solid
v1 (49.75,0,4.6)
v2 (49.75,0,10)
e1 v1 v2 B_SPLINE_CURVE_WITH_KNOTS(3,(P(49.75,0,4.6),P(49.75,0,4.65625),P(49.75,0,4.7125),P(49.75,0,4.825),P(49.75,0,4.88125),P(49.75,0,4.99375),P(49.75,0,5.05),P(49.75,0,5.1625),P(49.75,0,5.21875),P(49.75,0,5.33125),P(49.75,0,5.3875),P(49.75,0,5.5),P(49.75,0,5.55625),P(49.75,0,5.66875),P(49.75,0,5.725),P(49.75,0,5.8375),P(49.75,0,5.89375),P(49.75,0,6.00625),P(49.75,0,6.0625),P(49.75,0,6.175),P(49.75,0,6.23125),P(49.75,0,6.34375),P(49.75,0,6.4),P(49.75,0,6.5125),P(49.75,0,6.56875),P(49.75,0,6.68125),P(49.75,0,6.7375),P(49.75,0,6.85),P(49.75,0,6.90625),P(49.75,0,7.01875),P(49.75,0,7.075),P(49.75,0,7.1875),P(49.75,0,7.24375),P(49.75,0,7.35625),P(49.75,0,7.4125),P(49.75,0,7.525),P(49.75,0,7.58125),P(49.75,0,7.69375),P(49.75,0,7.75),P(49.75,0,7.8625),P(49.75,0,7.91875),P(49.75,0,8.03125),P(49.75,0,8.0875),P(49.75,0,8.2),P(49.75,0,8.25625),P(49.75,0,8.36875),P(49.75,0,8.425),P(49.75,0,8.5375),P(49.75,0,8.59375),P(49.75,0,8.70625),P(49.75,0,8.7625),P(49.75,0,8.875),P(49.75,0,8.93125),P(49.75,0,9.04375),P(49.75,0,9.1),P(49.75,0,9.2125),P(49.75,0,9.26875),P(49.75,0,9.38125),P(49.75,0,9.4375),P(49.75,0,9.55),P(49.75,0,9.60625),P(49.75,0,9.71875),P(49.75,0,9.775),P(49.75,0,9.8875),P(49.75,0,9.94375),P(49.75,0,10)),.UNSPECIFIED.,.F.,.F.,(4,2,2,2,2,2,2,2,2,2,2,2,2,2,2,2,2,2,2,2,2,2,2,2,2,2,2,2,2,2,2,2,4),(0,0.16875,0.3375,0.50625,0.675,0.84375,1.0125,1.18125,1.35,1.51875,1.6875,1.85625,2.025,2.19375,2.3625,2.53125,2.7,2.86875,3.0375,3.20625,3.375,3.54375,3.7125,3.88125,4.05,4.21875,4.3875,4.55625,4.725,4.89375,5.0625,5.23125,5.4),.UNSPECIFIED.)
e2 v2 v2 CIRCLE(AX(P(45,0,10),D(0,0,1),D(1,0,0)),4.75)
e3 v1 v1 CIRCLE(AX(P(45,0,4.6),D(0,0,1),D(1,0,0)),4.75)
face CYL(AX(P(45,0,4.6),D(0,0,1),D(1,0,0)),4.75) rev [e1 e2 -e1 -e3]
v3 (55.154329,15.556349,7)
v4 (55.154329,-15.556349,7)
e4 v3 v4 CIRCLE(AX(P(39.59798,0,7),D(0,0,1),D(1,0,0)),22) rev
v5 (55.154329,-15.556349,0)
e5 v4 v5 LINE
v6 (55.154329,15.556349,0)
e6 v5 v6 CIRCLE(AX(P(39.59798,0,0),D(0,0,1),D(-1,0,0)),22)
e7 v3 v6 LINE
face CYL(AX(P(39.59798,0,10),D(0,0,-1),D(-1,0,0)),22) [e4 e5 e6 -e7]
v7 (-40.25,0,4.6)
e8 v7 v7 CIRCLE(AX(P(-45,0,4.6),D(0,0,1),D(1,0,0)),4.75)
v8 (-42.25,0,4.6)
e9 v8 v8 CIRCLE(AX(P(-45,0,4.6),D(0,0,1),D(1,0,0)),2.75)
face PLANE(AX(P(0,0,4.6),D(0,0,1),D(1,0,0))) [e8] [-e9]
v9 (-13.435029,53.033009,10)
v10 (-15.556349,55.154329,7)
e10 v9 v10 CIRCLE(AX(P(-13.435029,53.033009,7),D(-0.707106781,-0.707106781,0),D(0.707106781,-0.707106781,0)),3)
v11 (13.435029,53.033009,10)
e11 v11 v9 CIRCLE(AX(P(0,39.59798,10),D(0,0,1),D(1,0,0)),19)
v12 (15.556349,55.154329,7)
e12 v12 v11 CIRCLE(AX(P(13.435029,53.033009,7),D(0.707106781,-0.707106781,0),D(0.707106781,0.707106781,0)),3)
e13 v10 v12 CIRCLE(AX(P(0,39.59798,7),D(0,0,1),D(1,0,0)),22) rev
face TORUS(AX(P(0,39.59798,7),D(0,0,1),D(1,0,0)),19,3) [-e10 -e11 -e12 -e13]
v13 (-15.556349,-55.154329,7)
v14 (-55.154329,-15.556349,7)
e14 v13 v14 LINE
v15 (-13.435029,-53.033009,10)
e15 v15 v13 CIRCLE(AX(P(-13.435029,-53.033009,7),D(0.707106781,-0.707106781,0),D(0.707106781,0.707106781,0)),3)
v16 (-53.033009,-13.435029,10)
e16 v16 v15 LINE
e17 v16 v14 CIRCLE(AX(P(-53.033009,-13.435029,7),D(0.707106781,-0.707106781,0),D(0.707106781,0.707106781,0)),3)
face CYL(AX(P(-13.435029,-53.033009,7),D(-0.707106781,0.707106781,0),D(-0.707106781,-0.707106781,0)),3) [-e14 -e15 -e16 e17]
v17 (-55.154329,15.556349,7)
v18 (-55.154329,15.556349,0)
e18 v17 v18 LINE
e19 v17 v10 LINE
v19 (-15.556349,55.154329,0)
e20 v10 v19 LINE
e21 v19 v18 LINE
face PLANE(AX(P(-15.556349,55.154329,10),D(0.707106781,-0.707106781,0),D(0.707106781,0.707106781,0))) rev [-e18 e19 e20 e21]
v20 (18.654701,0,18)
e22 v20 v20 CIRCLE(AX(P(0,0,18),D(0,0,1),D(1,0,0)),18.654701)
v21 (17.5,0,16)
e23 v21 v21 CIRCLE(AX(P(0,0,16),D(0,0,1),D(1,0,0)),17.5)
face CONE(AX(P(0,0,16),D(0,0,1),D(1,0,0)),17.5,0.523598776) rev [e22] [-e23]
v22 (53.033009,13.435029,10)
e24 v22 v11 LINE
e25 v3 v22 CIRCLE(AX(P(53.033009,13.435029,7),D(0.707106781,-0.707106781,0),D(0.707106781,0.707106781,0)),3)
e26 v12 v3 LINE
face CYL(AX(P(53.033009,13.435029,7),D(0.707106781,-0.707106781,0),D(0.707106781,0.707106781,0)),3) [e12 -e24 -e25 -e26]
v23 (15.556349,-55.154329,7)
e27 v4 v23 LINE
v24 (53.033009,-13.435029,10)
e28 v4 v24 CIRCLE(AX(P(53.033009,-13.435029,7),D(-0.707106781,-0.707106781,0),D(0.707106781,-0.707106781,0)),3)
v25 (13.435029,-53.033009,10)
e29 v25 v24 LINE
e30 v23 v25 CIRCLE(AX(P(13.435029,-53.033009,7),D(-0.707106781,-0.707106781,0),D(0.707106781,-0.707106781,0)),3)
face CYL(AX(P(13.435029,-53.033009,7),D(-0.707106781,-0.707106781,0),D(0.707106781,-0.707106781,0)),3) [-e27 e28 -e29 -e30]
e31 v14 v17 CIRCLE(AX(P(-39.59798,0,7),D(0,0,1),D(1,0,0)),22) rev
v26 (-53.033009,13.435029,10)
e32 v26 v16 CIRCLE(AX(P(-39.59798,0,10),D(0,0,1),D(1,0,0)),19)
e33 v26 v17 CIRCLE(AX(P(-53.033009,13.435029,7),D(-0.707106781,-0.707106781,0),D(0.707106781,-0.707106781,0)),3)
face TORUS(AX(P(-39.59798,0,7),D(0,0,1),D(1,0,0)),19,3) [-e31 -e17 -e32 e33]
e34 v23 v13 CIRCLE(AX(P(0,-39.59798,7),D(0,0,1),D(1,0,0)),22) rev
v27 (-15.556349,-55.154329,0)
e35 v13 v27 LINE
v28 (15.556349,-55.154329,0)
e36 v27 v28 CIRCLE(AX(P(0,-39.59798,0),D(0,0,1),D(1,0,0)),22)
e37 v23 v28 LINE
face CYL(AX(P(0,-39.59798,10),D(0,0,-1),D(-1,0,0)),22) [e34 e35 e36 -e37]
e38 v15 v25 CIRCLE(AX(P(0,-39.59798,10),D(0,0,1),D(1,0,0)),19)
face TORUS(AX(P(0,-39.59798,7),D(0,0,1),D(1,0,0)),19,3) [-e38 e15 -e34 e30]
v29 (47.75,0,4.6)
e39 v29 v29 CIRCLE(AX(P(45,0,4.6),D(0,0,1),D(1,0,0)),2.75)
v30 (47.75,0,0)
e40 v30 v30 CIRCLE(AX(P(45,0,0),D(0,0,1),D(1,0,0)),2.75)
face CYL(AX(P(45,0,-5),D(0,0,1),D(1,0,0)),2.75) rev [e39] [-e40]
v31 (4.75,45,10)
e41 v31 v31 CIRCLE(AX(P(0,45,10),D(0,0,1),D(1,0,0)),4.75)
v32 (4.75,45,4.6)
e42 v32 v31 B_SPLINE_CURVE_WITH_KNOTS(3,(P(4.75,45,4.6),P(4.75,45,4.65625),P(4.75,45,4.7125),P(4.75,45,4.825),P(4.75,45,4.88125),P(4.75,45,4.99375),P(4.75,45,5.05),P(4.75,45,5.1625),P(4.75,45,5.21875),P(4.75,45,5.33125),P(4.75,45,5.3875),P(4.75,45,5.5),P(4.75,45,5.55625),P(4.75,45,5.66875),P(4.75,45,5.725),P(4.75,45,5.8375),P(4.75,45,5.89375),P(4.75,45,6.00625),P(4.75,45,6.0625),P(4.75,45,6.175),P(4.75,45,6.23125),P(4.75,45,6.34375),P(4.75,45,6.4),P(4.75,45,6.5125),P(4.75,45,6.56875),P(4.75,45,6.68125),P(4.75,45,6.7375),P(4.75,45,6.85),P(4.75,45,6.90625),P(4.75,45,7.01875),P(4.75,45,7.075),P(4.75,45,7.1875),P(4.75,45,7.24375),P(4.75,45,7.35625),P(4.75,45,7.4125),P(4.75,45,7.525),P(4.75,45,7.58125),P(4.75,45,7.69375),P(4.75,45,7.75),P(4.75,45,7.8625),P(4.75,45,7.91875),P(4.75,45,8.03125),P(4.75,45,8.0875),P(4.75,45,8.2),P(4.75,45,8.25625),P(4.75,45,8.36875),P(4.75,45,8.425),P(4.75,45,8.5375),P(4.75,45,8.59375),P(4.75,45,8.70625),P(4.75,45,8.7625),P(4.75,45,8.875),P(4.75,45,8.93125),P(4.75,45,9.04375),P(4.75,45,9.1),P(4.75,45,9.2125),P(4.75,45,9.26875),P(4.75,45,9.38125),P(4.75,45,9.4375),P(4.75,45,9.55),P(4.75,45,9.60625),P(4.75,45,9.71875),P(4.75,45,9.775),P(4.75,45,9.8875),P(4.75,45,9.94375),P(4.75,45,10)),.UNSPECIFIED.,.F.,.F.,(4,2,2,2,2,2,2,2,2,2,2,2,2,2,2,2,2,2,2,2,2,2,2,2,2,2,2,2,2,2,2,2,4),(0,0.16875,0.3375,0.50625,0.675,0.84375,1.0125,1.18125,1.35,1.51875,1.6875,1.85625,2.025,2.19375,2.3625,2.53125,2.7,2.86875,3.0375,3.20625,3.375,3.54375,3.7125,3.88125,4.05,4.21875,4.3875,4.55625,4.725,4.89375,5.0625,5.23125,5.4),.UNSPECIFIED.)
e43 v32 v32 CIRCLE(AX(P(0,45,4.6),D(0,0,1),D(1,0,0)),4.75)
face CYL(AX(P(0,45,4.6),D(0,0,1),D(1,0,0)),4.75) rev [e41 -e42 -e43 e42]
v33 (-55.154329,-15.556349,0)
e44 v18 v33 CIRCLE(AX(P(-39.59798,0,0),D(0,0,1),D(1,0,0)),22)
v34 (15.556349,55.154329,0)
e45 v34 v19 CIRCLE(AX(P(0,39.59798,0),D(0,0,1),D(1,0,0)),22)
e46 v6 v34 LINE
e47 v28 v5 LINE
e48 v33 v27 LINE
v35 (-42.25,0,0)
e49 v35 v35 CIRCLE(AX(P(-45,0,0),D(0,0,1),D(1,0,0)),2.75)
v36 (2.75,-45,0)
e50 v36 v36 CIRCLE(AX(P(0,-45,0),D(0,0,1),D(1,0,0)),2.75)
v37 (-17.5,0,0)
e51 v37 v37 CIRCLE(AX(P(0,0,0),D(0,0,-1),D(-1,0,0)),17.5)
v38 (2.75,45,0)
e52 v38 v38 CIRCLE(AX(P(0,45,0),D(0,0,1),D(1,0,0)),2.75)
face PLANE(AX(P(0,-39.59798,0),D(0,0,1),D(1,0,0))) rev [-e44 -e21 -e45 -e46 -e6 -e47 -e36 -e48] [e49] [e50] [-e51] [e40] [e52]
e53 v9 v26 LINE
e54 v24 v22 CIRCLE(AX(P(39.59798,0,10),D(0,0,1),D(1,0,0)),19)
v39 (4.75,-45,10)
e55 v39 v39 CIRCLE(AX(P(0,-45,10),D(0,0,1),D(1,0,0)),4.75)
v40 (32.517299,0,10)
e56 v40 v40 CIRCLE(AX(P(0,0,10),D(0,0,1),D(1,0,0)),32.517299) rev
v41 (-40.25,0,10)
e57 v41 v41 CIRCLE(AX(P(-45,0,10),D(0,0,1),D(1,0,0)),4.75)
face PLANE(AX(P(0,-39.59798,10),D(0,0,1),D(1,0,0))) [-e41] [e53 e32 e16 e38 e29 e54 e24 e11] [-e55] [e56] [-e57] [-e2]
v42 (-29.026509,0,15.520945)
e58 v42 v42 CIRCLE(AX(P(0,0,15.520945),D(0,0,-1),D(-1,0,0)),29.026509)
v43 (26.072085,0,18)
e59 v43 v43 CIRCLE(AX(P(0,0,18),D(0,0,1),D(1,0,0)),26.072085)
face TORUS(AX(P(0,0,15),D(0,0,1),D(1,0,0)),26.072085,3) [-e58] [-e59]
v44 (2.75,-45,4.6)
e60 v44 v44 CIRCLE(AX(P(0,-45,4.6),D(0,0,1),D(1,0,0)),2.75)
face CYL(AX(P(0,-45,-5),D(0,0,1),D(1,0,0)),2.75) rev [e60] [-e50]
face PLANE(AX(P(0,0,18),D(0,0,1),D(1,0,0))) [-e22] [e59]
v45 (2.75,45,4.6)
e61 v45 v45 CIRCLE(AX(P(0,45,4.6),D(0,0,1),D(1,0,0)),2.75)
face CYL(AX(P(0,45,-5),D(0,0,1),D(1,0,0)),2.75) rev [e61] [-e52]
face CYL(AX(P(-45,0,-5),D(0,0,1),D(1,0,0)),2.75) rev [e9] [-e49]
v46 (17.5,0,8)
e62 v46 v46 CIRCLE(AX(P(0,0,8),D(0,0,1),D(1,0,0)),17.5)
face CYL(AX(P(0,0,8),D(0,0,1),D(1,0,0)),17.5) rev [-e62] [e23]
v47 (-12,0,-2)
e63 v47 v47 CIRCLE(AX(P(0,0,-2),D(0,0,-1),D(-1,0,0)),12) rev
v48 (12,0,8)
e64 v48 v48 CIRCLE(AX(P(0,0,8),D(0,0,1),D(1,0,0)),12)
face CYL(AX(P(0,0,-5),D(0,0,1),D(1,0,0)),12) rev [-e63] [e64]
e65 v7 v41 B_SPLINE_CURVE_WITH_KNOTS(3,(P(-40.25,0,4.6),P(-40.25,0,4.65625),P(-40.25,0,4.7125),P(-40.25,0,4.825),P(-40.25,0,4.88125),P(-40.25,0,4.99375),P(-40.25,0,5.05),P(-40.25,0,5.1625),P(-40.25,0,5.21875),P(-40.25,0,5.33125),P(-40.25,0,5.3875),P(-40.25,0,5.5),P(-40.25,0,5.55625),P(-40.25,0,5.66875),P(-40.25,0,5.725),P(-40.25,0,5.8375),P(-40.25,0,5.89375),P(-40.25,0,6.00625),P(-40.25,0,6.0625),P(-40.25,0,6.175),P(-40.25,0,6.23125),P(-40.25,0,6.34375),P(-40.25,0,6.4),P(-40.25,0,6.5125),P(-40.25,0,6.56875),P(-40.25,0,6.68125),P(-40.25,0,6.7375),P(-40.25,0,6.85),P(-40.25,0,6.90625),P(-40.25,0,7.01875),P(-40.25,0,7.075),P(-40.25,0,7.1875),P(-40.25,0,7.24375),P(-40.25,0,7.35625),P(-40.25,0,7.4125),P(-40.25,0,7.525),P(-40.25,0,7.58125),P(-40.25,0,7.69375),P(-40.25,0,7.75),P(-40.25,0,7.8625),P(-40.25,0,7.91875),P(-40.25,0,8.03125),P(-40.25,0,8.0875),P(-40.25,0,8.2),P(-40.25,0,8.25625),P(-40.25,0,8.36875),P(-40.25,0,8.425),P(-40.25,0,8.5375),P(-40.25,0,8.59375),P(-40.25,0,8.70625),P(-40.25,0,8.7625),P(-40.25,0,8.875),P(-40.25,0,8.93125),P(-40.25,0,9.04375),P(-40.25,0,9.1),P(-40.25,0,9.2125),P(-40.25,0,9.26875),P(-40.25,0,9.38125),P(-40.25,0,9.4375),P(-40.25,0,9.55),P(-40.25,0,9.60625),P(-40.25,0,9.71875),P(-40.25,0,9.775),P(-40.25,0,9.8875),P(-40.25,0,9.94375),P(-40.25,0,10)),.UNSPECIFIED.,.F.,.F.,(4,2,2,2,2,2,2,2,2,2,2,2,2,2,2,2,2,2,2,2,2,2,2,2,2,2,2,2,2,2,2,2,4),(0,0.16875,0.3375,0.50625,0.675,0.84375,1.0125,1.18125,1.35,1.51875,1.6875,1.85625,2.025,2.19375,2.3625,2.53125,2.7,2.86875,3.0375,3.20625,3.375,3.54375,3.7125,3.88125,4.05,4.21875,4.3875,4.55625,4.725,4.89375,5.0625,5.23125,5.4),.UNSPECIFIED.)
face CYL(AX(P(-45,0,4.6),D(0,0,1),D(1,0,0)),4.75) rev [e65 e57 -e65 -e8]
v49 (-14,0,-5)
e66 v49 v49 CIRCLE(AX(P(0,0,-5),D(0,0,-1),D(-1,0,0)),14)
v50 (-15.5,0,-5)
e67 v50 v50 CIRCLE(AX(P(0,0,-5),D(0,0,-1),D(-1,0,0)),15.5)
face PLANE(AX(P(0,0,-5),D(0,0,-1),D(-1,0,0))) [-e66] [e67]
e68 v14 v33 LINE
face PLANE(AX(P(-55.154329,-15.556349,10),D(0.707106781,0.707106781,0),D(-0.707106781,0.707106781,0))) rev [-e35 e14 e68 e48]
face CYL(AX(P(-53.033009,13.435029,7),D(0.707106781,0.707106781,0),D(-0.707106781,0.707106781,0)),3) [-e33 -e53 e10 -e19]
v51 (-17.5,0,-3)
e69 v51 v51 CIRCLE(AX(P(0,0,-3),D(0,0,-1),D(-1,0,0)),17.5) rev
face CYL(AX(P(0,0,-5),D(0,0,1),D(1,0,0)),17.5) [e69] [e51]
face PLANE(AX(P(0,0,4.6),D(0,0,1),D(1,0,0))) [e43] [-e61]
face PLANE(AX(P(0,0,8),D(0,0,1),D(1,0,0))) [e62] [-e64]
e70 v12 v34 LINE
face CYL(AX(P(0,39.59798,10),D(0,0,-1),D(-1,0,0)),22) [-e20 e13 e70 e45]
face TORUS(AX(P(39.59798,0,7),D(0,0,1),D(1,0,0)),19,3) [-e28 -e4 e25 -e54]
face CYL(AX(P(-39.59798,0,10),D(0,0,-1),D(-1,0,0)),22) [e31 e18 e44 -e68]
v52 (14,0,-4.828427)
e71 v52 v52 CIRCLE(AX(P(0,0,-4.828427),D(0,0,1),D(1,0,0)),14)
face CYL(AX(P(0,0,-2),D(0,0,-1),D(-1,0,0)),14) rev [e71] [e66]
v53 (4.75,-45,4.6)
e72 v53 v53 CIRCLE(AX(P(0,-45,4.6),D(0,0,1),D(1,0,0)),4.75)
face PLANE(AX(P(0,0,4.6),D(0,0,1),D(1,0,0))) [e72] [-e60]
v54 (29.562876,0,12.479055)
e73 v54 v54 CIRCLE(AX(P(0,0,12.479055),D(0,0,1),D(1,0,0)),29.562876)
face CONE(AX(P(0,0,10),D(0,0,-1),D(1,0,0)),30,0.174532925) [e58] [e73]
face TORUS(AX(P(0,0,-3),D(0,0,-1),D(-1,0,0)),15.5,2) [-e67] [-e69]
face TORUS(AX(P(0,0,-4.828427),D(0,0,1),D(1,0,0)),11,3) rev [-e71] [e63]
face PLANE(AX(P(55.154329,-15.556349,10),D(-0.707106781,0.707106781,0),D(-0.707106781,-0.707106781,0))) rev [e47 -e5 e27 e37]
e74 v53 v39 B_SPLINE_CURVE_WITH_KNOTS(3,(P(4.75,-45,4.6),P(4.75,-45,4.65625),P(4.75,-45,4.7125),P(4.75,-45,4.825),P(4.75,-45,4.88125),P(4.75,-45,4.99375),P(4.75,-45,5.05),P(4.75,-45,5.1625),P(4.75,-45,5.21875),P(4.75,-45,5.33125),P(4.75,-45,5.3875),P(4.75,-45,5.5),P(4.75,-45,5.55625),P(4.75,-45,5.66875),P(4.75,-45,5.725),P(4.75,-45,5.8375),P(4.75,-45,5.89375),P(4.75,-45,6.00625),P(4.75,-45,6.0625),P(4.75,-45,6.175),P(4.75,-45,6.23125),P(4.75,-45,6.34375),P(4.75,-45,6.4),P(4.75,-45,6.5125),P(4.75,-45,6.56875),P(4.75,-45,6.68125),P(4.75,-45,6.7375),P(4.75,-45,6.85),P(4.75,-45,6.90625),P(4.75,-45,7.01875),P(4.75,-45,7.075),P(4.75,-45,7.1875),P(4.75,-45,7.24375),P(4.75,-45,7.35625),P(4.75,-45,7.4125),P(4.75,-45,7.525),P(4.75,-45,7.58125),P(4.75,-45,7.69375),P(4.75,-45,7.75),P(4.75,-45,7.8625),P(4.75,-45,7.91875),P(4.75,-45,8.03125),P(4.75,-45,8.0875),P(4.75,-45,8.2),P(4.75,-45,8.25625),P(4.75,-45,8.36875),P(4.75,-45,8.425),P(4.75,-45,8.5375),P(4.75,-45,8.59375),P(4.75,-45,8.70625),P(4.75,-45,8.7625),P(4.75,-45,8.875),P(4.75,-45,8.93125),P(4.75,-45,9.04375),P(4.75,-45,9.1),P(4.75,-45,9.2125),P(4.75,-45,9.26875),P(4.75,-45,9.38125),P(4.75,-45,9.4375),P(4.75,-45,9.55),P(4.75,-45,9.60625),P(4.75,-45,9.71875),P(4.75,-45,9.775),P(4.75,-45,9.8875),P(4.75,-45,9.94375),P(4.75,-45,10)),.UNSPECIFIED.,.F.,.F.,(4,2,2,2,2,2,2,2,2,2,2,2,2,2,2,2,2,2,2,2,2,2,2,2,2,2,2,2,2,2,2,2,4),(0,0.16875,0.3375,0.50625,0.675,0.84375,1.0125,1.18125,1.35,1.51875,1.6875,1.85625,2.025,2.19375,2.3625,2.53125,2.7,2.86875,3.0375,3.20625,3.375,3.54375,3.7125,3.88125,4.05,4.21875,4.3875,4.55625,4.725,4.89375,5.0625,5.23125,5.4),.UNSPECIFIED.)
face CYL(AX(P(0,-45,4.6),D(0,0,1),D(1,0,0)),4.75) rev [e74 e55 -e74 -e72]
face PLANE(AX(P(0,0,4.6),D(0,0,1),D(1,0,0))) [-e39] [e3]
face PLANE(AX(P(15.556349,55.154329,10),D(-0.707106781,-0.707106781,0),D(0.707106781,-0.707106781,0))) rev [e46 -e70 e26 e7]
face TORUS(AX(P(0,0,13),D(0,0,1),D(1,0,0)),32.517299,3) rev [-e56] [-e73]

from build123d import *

# Parameters (mm, degrees)
BOSS_EXTRUDE1_DEPTH     = 10
SKETCH2_R               = 30
BOSS_EXTRUDE2_DEPTH     = 8
BOSS_EXTRUDE2_TAPER     = 10
SKETCH4_R               = 17.5
BOSS_EXTRUDE3_DEPTH     = 5
CUT_EXTRUDE1_DEPTH      = 91.097848019
CUT_EXTRUDE1_DEPTH_BACK = 91.097848019
SKETCH3_R               = 12
SKETCH3_3_R             = 17.5
SKETCH3_3_R_2           = 12
CUT_EXTRUDE2_DEPTH      = 10
SKETCH5_R               = 14
CUT_EXTRUDE3_DEPTH      = 3
CUT_EXTRUDE4_DEPTH      = 89.394695642
CUT_EXTRUDE4_DEPTH_BACK = 89.394695642
SKETCH6_R               = 2.75
SKETCH6_3_R             = 4.75
SKETCH6_3_R_2           = 2.75
CUT_EXTRUDE5_DEPTH      = 5.4
FILLET1_R               = 3
FILLET2_R               = 3
FILLET3_R               = 3
FILLET4_R               = 2


with BuildPart() as part:
    # Sketch1 → Boss-Extrude1 (new body)
    with BuildSketch(Plane.XY):
        with BuildLine():
            Line((-15.556349186, 55.154328933), (-55.154328933, 15.556349186))
            ThreePointArc((-55.154328933, 15.556349186), (-61.597979746, 0), (-55.154328933, -15.556349186))
            Line((-55.154328933, -15.556349186), (-15.556349186, -55.154328933))
            ThreePointArc((-15.556349186, -55.154328933), (0, -61.597979746), (15.556349186, -55.154328933))
            Line((15.556349186, -55.154328933), (55.154328933, -15.556349186))
            ThreePointArc((55.154328933, -15.556349186), (61.597979746, 0), (55.154328933, 15.556349186))
            Line((55.154328933, 15.556349186), (15.556349186, 55.154328933))
            ThreePointArc((15.556349186, 55.154328933), (0, 61.597979746), (-15.556349186, 55.154328933))
        make_face()
    extrude(amount=BOSS_EXTRUDE1_DEPTH)

    # Sketch2 → Boss-Extrude2 (add)
    with BuildSketch(Plane.XY.offset(10)):
        Circle(SKETCH2_R)
    extrude(amount=BOSS_EXTRUDE2_DEPTH, taper=BOSS_EXTRUDE2_TAPER)

    # Sketch4 → Boss-Extrude3 (add)
    with BuildSketch(Plane(origin=(0, 0, 0), x_dir=(-1, 0, 0), z_dir=(0, 0, -1))):
        Circle(SKETCH4_R)
    extrude(amount=BOSS_EXTRUDE3_DEPTH)

    # Sketch3 → Cut-Extrude1 (cut, two sides: drawn at the far end of the back side and taken through both)
    with BuildSketch(Plane.XY.offset(18).offset(-CUT_EXTRUDE1_DEPTH_BACK)):
        Circle(SKETCH3_R)
    extrude(amount=CUT_EXTRUDE1_DEPTH + CUT_EXTRUDE1_DEPTH_BACK, mode=Mode.SUBTRACT)

    # Sketch3<3> → Cut-Extrude2 (cut)
    with BuildSketch(Plane.XY.offset(18)):
        with Locations(Location((0, 0, 0), (0, 0, 180))):
            Circle(SKETCH3_3_R)
        Circle(SKETCH3_3_R_2, mode=Mode.SUBTRACT)
    extrude(amount=-CUT_EXTRUDE2_DEPTH, mode=Mode.SUBTRACT)

    # Sketch5 → Cut-Extrude3 (cut)
    with BuildSketch(Plane(origin=(0, 0, -5), x_dir=(-1, 0, 0), z_dir=(0, 0, -1))):
        Circle(SKETCH5_R)
    extrude(amount=-CUT_EXTRUDE3_DEPTH, mode=Mode.SUBTRACT)

    # Sketch6 → Cut-Extrude4 (cut, two sides: drawn at the far end of the back side and taken through both)
    with BuildSketch(Plane.XY.offset(10).offset(-CUT_EXTRUDE4_DEPTH_BACK)):
        with Locations((0, 45)):
            Circle(SKETCH6_R)
        with Locations((45, 0)):
            Circle(SKETCH6_R)
        with Locations((0, -45)):
            Circle(SKETCH6_R)
        with Locations((-45, 0)):
            Circle(SKETCH6_R)
    extrude(amount=CUT_EXTRUDE4_DEPTH + CUT_EXTRUDE4_DEPTH_BACK, mode=Mode.SUBTRACT)

    # Sketch6<3> → Cut-Extrude5 (cut)
    # profile 1 of 4: a face of its own
    with BuildSketch(Plane.XY.offset(10)):
        with Locations((-45, 0)):
            Circle(SKETCH6_3_R)
        with Locations((-45, 0)):
            Circle(SKETCH6_3_R_2, mode=Mode.SUBTRACT)
    # profile 2 of 4: a face of its own
    with BuildSketch(Plane.XY.offset(10)):
        with Locations((0, -45)):
            Circle(SKETCH6_3_R)
        with Locations((0, -45)):
            Circle(SKETCH6_3_R_2, mode=Mode.SUBTRACT)
    # profile 3 of 4: a face of its own
    with BuildSketch(Plane.XY.offset(10)):
        with Locations((45, 0)):
            Circle(SKETCH6_3_R)
        with Locations((45, 0)):
            Circle(SKETCH6_3_R_2, mode=Mode.SUBTRACT)
    # profile 4 of 4: a face of its own
    with BuildSketch(Plane.XY.offset(10)):
        with Locations((0, 45)):
            Circle(SKETCH6_3_R)
        with Locations((0, 45)):
            Circle(SKETCH6_3_R_2, mode=Mode.SUBTRACT)
    extrude(amount=-CUT_EXTRUDE5_DEPTH, mode=Mode.SUBTRACT)

    # Sketch7 → Cut-Revolve1 (revolve, cut)
    with BuildSketch(Plane(origin=(0, 0, 0), x_dir=(0, 0, -1), z_dir=(1, 0, 0)), mode=Mode.PRIVATE) as cut_revolve1_sk:
        Polygon((-18, 17.5), (-16, 17.5), (-18, 18.654700538), align=None)
    revolve(cut_revolve1_sk.sketch.rotate(Axis((0, 0, 32.778670792), (0, 0, -1)), 90), axis=Axis((0, 0, 32.778670792), (0, 0, -1)), mode=Mode.SUBTRACT)

    # Fillet1
    fillet1_edges = [part.edges().sort_by_distance(p)[0] for p in [
        (-30, 0, 10),
        (-28.589384154, 0, 18),
    ]]
    fillet(fillet1_edges, radius=FILLET1_R)

    # Fillet2
    fillet2_edges = [part.edges().sort_by_distance(p)[0] for p in [
        (61.597979746, 0, 10),
        (35.355339059, 35.355339059, 10),
        (0, 61.597979746, 10),
        (-35.355339059, 35.355339059, 10),
        (-61.597979746, 0, 10),
        (-35.355339059, -35.355339059, 10),
        (0, -61.597979746, 10),
        (35.355339059, -35.355339059, 10),
    ]]
    fillet(fillet2_edges, radius=FILLET2_R)

    # Fillet3
    # the kernel refuses this fillet: 3 mm, written as the material it adds along each edge
    with BuildSketch(Plane(origin=(0, 0, -2), x_dir=(-1, 0, 0), z_dir=(0, -1, 0))) as fillet3_piece_1:
        with BuildLine():
            CenterArc((11, 2.828427125), FILLET3_R, 289.471220634, 70.528779366)
            Line((12, 0), (12.02, -0.056568542))
            ThreePointArc((12.02, -0.056568542), (13, -0.06), (14, -0.06))
            Line((14, -0.06), (14.06, 0))
            Line((14.06, 0), (14.06, 2.828427125))
            Line((14.06, 2.828427125), (14, 2.828427125))
        make_face()
    revolve(axis=Axis((0, 0, -2), (0, 0, -1)))

    # Fillet4
    fillet4_edges = [part.edges().sort_by_distance(p)[0] for p in [
        (17.5, 0, -5),
    ]]
    fillet(fillet4_edges, radius=FILLET4_R)


solid = part.part
